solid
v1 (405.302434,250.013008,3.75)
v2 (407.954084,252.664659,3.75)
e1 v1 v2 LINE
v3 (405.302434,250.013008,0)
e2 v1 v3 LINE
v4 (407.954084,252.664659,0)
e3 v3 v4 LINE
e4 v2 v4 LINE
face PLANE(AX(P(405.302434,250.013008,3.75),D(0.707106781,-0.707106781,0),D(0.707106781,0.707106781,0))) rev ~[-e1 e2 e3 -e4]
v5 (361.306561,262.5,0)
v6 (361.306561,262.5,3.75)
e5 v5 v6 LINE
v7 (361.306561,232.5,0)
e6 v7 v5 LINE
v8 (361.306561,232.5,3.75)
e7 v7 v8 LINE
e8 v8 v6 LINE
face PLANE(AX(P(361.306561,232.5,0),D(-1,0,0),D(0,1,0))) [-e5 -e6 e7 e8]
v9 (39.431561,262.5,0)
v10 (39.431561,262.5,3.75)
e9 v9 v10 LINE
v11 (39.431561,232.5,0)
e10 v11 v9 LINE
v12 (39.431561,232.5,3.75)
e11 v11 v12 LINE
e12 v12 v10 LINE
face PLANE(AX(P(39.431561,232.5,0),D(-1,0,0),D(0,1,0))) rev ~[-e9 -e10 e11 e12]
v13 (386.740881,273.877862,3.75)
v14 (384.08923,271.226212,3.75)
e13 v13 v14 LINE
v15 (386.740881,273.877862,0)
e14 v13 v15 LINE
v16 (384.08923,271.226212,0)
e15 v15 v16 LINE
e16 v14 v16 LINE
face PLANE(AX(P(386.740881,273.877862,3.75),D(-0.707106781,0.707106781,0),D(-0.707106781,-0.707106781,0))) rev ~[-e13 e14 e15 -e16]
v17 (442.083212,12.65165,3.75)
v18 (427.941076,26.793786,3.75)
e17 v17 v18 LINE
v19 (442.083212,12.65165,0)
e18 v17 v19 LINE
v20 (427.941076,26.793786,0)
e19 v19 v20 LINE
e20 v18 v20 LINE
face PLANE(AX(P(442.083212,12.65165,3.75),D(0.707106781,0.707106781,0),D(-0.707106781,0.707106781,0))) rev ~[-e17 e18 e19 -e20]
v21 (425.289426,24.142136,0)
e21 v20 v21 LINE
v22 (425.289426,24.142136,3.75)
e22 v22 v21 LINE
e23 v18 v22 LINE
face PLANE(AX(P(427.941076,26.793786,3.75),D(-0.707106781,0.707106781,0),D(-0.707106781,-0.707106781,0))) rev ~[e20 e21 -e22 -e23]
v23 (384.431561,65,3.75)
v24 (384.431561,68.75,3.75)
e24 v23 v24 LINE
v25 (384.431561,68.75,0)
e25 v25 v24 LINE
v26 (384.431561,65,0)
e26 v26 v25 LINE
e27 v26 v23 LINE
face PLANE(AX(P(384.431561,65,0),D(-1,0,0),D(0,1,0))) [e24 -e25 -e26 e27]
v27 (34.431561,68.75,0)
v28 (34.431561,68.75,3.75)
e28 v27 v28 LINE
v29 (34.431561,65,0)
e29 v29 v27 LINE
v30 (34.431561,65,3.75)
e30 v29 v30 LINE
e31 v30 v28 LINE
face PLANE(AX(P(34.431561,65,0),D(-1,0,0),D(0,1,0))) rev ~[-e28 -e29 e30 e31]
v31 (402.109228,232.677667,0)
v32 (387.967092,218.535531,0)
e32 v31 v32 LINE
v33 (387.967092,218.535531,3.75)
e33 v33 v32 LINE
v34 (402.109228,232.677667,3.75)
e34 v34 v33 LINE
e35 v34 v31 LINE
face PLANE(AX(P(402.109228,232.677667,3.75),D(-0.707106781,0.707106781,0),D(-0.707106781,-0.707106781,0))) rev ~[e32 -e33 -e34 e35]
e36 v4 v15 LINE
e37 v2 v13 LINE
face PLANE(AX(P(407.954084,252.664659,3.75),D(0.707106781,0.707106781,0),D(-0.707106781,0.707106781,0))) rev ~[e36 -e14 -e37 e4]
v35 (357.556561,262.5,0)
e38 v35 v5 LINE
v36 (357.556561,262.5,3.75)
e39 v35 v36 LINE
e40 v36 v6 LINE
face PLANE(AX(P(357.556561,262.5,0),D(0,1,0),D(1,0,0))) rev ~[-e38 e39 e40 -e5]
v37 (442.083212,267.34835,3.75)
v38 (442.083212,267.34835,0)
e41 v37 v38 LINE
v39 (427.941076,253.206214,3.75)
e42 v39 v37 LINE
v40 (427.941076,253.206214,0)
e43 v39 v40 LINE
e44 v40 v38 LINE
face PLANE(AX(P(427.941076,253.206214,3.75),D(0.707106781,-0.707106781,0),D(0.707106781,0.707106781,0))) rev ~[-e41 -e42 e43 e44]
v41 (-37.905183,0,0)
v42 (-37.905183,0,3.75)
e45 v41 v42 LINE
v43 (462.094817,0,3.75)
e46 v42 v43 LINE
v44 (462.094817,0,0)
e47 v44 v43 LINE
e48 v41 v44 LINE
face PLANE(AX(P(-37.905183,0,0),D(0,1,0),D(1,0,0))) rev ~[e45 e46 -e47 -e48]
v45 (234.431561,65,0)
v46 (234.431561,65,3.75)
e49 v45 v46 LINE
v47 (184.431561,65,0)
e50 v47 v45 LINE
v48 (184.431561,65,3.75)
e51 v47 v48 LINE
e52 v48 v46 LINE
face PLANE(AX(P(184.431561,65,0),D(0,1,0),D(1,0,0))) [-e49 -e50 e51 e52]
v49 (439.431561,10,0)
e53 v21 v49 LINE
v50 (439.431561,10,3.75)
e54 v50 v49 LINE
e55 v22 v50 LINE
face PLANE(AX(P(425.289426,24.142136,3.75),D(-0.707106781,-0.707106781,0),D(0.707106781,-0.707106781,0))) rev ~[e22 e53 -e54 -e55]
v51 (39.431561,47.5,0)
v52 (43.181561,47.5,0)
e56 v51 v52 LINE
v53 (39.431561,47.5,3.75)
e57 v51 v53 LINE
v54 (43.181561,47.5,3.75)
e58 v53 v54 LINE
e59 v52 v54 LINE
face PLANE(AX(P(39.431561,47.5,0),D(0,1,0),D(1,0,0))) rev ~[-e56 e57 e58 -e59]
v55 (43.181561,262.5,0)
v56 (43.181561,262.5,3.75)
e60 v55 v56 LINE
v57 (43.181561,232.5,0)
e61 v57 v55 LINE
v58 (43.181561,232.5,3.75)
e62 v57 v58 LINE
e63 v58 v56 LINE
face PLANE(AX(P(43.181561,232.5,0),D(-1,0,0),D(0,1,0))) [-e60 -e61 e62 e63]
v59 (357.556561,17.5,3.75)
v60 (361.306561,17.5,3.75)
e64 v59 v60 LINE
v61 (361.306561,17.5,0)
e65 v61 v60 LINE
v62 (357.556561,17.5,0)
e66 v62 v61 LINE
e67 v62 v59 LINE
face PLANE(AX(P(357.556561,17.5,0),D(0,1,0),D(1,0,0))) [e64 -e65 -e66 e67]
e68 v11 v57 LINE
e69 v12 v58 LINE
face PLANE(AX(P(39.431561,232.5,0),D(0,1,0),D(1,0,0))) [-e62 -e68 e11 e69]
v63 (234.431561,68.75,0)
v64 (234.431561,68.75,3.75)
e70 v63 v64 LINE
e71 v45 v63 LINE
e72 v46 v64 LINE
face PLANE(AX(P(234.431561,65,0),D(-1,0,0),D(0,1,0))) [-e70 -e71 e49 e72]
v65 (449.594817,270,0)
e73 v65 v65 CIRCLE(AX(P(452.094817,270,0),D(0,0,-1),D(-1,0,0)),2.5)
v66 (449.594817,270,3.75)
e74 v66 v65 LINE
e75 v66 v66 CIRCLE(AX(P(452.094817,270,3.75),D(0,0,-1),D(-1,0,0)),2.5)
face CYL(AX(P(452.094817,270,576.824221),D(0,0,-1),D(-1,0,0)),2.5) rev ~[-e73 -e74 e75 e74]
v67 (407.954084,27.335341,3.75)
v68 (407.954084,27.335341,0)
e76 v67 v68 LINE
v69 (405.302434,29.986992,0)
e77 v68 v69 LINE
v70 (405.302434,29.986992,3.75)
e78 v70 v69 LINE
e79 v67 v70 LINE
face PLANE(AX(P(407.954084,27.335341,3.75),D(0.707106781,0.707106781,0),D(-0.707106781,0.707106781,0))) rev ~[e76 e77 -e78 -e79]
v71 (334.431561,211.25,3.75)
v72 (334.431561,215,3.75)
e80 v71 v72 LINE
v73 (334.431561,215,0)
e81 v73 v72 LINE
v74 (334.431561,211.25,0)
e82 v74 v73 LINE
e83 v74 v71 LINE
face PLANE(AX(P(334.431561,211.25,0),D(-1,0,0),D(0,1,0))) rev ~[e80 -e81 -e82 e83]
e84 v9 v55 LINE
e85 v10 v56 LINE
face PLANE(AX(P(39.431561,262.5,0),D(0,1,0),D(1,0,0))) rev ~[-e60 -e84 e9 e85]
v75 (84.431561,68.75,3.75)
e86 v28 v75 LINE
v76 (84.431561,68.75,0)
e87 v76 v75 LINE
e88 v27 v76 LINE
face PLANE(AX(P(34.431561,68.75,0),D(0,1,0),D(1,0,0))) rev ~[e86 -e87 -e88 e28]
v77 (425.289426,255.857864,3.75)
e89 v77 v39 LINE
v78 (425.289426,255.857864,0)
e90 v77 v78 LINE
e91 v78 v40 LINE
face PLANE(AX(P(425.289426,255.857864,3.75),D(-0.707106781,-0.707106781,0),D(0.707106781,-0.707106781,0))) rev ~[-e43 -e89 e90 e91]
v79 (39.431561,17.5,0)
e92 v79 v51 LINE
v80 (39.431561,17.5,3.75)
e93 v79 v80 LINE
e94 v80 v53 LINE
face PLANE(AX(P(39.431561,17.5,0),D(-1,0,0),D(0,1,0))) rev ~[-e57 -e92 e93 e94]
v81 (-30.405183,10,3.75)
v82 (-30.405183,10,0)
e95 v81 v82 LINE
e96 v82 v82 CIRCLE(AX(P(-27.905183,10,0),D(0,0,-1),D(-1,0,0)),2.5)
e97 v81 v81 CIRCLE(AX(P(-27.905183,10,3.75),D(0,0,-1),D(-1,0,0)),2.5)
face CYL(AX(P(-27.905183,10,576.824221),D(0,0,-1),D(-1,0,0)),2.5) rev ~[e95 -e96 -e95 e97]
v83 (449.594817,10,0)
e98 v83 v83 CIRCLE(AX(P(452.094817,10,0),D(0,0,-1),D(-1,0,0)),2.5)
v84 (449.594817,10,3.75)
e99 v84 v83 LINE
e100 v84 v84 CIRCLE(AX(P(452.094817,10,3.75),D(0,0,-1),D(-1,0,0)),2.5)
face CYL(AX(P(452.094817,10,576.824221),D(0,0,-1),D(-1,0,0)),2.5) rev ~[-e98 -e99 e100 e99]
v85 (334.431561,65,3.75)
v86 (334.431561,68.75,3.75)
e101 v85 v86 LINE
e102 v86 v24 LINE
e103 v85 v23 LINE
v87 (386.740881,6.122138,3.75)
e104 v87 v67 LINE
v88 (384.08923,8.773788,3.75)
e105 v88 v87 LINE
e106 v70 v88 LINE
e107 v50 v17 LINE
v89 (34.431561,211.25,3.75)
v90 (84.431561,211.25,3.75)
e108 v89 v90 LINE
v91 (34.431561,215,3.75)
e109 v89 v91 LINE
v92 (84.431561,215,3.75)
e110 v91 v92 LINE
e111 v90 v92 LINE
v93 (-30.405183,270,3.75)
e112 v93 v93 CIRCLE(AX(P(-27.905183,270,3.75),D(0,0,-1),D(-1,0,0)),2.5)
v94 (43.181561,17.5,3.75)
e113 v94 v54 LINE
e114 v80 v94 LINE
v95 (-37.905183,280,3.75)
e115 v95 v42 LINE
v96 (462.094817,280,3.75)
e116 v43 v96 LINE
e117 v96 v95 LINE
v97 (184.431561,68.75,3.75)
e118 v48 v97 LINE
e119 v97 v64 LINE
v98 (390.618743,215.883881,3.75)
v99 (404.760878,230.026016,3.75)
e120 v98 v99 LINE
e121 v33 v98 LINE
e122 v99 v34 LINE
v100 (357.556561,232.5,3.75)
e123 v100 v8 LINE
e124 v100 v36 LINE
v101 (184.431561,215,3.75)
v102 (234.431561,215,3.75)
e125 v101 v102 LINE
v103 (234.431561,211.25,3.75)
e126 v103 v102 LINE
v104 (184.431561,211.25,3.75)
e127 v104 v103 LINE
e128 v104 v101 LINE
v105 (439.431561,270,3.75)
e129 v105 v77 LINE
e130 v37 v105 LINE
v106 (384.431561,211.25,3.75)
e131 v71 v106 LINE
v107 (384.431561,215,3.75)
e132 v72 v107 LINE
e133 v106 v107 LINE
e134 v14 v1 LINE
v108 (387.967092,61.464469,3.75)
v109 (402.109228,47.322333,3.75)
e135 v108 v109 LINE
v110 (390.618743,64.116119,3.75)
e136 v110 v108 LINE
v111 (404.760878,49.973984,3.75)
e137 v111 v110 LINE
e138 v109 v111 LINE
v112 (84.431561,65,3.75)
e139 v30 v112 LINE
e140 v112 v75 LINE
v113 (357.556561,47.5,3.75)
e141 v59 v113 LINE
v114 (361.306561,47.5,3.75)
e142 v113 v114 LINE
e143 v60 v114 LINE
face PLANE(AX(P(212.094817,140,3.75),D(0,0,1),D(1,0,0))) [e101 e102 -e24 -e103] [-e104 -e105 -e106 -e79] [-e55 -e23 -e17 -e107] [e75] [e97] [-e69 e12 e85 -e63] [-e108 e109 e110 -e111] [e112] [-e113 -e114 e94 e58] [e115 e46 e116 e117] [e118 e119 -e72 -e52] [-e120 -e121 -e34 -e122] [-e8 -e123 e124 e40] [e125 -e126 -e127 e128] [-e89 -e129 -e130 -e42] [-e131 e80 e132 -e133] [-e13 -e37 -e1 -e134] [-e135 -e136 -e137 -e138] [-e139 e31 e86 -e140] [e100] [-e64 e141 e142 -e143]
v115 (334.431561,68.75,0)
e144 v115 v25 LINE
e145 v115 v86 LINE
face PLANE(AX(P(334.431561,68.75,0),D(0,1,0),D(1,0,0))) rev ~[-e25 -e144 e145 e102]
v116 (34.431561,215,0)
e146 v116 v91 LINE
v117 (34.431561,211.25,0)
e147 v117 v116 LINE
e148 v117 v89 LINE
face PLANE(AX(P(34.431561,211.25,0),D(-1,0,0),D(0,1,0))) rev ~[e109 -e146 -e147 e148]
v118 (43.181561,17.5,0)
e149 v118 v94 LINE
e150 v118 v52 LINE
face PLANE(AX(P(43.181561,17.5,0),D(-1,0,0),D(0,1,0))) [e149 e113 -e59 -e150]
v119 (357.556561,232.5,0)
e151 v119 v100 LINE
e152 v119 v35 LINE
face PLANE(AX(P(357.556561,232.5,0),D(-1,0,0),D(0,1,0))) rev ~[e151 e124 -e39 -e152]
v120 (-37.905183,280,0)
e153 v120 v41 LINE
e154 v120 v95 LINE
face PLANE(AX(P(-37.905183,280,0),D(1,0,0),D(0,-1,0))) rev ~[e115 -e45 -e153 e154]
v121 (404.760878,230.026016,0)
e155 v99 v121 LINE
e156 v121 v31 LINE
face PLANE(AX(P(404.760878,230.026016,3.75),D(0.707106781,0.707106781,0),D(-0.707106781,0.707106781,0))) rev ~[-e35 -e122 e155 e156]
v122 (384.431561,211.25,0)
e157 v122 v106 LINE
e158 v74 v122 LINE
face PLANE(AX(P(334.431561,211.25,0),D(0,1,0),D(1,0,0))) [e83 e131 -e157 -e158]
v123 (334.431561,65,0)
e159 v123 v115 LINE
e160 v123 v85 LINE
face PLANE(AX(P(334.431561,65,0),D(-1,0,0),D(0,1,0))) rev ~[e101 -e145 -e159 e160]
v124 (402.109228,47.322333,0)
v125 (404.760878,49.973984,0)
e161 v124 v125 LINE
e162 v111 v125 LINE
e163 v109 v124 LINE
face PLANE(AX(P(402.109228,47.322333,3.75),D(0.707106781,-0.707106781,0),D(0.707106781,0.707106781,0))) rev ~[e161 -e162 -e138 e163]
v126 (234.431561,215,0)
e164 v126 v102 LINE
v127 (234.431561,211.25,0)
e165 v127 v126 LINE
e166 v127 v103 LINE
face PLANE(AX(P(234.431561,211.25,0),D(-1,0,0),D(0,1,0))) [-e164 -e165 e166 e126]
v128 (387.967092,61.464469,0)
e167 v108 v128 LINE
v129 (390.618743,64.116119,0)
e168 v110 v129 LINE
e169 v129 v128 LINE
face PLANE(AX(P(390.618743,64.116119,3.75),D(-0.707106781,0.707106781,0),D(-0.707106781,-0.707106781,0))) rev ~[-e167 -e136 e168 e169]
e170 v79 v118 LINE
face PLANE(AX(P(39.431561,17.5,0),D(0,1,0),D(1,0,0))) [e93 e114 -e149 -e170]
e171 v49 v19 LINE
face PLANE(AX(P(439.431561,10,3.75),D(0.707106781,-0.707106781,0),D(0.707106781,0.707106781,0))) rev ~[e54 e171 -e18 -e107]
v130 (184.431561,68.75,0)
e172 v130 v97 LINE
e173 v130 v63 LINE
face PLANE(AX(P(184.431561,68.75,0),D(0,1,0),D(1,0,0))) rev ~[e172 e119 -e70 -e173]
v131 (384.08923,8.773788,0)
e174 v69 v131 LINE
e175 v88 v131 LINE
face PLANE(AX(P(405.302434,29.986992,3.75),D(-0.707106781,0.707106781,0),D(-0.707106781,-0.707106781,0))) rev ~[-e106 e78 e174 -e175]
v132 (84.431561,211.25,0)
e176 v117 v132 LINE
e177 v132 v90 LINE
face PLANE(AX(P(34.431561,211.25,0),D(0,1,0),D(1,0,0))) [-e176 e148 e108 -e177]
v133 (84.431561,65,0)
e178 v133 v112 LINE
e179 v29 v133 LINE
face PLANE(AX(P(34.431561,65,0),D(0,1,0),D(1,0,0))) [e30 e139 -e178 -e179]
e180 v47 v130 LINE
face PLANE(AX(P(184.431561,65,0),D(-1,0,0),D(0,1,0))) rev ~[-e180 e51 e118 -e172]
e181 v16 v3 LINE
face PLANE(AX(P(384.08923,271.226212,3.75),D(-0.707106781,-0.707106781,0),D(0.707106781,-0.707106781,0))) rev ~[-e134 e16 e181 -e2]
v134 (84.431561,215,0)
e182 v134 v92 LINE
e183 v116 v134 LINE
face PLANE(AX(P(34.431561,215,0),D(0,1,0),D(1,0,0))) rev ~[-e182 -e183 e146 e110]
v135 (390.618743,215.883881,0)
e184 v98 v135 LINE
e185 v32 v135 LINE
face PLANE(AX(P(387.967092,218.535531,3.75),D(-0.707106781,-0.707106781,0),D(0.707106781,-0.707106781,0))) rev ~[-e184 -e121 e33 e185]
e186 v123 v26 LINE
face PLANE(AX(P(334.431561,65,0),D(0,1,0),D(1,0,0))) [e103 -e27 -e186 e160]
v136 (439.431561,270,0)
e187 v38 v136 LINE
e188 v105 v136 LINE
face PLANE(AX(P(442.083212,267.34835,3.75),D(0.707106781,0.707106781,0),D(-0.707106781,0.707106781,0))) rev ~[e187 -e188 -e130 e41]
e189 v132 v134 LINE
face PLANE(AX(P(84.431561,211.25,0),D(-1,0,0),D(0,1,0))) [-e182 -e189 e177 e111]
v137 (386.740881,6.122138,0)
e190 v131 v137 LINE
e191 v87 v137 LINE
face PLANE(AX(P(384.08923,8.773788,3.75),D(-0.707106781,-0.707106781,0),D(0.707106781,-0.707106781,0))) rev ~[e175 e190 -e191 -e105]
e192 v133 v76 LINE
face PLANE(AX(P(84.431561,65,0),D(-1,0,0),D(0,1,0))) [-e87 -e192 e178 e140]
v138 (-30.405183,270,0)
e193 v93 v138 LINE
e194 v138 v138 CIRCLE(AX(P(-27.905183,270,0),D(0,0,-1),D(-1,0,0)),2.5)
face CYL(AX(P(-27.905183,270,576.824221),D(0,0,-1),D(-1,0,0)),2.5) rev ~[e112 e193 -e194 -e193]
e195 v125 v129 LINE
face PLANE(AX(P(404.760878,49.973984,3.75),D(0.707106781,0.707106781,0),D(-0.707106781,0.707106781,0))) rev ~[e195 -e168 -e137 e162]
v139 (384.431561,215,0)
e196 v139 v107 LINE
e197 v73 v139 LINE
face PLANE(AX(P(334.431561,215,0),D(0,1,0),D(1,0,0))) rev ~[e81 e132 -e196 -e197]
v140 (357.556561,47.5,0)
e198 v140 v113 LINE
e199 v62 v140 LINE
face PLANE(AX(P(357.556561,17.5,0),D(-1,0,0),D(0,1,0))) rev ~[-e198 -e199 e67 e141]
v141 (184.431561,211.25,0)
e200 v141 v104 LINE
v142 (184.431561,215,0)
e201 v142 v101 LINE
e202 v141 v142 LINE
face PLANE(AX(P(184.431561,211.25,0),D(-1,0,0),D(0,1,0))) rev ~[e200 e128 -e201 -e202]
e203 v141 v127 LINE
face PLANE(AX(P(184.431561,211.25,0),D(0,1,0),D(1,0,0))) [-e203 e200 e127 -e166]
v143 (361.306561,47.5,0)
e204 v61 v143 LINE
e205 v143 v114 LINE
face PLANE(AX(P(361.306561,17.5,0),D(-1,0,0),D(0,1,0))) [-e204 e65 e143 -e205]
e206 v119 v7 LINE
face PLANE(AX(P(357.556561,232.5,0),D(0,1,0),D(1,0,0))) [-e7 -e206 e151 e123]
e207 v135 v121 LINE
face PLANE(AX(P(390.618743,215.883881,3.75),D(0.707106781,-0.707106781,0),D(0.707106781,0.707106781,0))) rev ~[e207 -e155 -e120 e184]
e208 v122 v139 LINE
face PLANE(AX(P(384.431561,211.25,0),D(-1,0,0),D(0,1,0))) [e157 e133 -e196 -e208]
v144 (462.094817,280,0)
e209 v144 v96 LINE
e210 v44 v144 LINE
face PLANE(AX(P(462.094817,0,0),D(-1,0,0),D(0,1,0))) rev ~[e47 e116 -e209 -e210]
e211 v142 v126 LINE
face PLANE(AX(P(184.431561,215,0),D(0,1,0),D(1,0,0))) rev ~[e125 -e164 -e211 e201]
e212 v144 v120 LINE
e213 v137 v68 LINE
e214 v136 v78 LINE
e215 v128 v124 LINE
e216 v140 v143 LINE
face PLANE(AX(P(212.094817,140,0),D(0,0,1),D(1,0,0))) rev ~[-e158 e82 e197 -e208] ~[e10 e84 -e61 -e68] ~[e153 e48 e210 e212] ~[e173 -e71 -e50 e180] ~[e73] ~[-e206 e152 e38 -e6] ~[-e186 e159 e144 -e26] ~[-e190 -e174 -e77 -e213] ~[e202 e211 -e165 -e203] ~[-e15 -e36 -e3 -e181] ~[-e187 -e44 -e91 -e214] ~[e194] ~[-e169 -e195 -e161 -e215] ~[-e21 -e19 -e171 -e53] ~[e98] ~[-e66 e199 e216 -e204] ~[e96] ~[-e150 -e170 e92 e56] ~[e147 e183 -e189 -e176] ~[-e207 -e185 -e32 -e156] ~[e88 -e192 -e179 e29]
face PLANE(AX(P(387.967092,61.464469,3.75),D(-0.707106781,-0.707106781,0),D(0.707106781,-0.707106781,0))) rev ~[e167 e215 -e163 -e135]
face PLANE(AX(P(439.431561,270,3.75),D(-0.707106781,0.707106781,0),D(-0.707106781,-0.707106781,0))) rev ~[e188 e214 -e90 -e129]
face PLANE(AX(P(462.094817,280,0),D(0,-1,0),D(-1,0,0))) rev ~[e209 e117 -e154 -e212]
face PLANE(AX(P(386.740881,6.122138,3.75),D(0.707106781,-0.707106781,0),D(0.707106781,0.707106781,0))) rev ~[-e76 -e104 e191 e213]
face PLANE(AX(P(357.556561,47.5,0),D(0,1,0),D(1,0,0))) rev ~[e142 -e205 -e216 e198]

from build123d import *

# Parameters (mm, degrees)
F0_W     = 3.75
F0_H     = 30
F0_W_2   = 50
F0_H_2   = 3.75
F1_DEPTH = 3.75
F3_D     = 5
F5_DEPTH = 3.75


# Not quite as in the source:
# - a feature names something its author has since deleted; it is built from what else it names


with BuildPart() as f1:
    # F0 (on Top) → F1 (new body)
    with BuildSketch(Plane.XY):
        Polygon((-37.9051826894, 0), (12.0948173106, 0), (462.0948173106, 0), (462.0948173106, 280), (62.0948173106, 280), (-37.9051826894, 280), align=None)
        with Locations((41.3065613726, 32.5)):
            Rectangle(F0_W, F0_H, mode=Mode.SUBTRACT)
        with Locations((59.4315613726, 66.875)):
            Rectangle(F0_W_2, F0_H_2, mode=Mode.SUBTRACT)
        with Locations((209.4315613726, 66.875)):
            Rectangle(F0_W_2, F0_H_2, mode=Mode.SUBTRACT)
        with Locations((359.4315613726, 32.5)):
            Rectangle(F0_W, F0_H, mode=Mode.SUBTRACT)
        with Locations((359.4315613726, 66.875)):
            Rectangle(F0_W_2, F0_H_2, mode=Mode.SUBTRACT)
        with Locations((59.4315613726, 213.125)):
            Rectangle(F0_W_2, F0_H_2, mode=Mode.SUBTRACT)
        with Locations((41.3065613726, 247.5)):
            Rectangle(F0_W, F0_H, mode=Mode.SUBTRACT)
        with Locations((209.4315613726, 213.125)):
            Rectangle(F0_W_2, F0_H_2, mode=Mode.SUBTRACT)
        with Locations((359.4315613726, 213.125)):
            Rectangle(F0_W_2, F0_H_2, mode=Mode.SUBTRACT)
        with Locations((359.4315613726, 247.5)):
            Rectangle(F0_W, F0_H, mode=Mode.SUBTRACT)
    extrude(amount=F1_DEPTH)

    # F3 (through all)
    with Locations(Plane.XY.offset(3.75)):
        with Locations((-27.9051826894, 10), (-27.9051826894, 270), (452.0948173106, 10), (452.0948173106, 270)):
            Hole(F3_D / 2)

    # F4 (on face) → F5 (cut)
    with BuildSketch(Plane.XY.offset(3.75)):
        Polygon((442.083211802, 267.3483495706), (439.4315613726, 270), (425.2894257488, 255.8578643763), (427.9410761783, 253.2062139468), align=None)
        Polygon((402.1092280247, 232.6776666521), (387.9670924009, 218.5355310284), (390.6187428304, 215.8838805989), (404.7608784541, 230.0260162227), align=None)
        Polygon((386.740880854, 273.8778619764), (384.0892304246, 271.2262115469), (405.3024338602, 250.0130081113), (407.9540842896, 252.6646585408), align=None)
        Polygon((387.9670924009, 61.4644689716), (402.1092280247, 47.3223333479), (404.7608784541, 49.9739837773), (390.6187428304, 64.1161194011), align=None)
        Polygon((405.3024338602, 29.9869918887), (384.0892304246, 8.7737884531), (386.740880854, 6.1221380236), (407.9540842896, 27.3353414592), align=None)
        Polygon((427.9410761783, 26.7937860532), (425.2894257488, 24.1421356237), (439.4315613726, 10), (442.083211802, 12.6516504294), align=None)
    extrude(amount=-F5_DEPTH, mode=Mode.SUBTRACT)


solid = f1.part
